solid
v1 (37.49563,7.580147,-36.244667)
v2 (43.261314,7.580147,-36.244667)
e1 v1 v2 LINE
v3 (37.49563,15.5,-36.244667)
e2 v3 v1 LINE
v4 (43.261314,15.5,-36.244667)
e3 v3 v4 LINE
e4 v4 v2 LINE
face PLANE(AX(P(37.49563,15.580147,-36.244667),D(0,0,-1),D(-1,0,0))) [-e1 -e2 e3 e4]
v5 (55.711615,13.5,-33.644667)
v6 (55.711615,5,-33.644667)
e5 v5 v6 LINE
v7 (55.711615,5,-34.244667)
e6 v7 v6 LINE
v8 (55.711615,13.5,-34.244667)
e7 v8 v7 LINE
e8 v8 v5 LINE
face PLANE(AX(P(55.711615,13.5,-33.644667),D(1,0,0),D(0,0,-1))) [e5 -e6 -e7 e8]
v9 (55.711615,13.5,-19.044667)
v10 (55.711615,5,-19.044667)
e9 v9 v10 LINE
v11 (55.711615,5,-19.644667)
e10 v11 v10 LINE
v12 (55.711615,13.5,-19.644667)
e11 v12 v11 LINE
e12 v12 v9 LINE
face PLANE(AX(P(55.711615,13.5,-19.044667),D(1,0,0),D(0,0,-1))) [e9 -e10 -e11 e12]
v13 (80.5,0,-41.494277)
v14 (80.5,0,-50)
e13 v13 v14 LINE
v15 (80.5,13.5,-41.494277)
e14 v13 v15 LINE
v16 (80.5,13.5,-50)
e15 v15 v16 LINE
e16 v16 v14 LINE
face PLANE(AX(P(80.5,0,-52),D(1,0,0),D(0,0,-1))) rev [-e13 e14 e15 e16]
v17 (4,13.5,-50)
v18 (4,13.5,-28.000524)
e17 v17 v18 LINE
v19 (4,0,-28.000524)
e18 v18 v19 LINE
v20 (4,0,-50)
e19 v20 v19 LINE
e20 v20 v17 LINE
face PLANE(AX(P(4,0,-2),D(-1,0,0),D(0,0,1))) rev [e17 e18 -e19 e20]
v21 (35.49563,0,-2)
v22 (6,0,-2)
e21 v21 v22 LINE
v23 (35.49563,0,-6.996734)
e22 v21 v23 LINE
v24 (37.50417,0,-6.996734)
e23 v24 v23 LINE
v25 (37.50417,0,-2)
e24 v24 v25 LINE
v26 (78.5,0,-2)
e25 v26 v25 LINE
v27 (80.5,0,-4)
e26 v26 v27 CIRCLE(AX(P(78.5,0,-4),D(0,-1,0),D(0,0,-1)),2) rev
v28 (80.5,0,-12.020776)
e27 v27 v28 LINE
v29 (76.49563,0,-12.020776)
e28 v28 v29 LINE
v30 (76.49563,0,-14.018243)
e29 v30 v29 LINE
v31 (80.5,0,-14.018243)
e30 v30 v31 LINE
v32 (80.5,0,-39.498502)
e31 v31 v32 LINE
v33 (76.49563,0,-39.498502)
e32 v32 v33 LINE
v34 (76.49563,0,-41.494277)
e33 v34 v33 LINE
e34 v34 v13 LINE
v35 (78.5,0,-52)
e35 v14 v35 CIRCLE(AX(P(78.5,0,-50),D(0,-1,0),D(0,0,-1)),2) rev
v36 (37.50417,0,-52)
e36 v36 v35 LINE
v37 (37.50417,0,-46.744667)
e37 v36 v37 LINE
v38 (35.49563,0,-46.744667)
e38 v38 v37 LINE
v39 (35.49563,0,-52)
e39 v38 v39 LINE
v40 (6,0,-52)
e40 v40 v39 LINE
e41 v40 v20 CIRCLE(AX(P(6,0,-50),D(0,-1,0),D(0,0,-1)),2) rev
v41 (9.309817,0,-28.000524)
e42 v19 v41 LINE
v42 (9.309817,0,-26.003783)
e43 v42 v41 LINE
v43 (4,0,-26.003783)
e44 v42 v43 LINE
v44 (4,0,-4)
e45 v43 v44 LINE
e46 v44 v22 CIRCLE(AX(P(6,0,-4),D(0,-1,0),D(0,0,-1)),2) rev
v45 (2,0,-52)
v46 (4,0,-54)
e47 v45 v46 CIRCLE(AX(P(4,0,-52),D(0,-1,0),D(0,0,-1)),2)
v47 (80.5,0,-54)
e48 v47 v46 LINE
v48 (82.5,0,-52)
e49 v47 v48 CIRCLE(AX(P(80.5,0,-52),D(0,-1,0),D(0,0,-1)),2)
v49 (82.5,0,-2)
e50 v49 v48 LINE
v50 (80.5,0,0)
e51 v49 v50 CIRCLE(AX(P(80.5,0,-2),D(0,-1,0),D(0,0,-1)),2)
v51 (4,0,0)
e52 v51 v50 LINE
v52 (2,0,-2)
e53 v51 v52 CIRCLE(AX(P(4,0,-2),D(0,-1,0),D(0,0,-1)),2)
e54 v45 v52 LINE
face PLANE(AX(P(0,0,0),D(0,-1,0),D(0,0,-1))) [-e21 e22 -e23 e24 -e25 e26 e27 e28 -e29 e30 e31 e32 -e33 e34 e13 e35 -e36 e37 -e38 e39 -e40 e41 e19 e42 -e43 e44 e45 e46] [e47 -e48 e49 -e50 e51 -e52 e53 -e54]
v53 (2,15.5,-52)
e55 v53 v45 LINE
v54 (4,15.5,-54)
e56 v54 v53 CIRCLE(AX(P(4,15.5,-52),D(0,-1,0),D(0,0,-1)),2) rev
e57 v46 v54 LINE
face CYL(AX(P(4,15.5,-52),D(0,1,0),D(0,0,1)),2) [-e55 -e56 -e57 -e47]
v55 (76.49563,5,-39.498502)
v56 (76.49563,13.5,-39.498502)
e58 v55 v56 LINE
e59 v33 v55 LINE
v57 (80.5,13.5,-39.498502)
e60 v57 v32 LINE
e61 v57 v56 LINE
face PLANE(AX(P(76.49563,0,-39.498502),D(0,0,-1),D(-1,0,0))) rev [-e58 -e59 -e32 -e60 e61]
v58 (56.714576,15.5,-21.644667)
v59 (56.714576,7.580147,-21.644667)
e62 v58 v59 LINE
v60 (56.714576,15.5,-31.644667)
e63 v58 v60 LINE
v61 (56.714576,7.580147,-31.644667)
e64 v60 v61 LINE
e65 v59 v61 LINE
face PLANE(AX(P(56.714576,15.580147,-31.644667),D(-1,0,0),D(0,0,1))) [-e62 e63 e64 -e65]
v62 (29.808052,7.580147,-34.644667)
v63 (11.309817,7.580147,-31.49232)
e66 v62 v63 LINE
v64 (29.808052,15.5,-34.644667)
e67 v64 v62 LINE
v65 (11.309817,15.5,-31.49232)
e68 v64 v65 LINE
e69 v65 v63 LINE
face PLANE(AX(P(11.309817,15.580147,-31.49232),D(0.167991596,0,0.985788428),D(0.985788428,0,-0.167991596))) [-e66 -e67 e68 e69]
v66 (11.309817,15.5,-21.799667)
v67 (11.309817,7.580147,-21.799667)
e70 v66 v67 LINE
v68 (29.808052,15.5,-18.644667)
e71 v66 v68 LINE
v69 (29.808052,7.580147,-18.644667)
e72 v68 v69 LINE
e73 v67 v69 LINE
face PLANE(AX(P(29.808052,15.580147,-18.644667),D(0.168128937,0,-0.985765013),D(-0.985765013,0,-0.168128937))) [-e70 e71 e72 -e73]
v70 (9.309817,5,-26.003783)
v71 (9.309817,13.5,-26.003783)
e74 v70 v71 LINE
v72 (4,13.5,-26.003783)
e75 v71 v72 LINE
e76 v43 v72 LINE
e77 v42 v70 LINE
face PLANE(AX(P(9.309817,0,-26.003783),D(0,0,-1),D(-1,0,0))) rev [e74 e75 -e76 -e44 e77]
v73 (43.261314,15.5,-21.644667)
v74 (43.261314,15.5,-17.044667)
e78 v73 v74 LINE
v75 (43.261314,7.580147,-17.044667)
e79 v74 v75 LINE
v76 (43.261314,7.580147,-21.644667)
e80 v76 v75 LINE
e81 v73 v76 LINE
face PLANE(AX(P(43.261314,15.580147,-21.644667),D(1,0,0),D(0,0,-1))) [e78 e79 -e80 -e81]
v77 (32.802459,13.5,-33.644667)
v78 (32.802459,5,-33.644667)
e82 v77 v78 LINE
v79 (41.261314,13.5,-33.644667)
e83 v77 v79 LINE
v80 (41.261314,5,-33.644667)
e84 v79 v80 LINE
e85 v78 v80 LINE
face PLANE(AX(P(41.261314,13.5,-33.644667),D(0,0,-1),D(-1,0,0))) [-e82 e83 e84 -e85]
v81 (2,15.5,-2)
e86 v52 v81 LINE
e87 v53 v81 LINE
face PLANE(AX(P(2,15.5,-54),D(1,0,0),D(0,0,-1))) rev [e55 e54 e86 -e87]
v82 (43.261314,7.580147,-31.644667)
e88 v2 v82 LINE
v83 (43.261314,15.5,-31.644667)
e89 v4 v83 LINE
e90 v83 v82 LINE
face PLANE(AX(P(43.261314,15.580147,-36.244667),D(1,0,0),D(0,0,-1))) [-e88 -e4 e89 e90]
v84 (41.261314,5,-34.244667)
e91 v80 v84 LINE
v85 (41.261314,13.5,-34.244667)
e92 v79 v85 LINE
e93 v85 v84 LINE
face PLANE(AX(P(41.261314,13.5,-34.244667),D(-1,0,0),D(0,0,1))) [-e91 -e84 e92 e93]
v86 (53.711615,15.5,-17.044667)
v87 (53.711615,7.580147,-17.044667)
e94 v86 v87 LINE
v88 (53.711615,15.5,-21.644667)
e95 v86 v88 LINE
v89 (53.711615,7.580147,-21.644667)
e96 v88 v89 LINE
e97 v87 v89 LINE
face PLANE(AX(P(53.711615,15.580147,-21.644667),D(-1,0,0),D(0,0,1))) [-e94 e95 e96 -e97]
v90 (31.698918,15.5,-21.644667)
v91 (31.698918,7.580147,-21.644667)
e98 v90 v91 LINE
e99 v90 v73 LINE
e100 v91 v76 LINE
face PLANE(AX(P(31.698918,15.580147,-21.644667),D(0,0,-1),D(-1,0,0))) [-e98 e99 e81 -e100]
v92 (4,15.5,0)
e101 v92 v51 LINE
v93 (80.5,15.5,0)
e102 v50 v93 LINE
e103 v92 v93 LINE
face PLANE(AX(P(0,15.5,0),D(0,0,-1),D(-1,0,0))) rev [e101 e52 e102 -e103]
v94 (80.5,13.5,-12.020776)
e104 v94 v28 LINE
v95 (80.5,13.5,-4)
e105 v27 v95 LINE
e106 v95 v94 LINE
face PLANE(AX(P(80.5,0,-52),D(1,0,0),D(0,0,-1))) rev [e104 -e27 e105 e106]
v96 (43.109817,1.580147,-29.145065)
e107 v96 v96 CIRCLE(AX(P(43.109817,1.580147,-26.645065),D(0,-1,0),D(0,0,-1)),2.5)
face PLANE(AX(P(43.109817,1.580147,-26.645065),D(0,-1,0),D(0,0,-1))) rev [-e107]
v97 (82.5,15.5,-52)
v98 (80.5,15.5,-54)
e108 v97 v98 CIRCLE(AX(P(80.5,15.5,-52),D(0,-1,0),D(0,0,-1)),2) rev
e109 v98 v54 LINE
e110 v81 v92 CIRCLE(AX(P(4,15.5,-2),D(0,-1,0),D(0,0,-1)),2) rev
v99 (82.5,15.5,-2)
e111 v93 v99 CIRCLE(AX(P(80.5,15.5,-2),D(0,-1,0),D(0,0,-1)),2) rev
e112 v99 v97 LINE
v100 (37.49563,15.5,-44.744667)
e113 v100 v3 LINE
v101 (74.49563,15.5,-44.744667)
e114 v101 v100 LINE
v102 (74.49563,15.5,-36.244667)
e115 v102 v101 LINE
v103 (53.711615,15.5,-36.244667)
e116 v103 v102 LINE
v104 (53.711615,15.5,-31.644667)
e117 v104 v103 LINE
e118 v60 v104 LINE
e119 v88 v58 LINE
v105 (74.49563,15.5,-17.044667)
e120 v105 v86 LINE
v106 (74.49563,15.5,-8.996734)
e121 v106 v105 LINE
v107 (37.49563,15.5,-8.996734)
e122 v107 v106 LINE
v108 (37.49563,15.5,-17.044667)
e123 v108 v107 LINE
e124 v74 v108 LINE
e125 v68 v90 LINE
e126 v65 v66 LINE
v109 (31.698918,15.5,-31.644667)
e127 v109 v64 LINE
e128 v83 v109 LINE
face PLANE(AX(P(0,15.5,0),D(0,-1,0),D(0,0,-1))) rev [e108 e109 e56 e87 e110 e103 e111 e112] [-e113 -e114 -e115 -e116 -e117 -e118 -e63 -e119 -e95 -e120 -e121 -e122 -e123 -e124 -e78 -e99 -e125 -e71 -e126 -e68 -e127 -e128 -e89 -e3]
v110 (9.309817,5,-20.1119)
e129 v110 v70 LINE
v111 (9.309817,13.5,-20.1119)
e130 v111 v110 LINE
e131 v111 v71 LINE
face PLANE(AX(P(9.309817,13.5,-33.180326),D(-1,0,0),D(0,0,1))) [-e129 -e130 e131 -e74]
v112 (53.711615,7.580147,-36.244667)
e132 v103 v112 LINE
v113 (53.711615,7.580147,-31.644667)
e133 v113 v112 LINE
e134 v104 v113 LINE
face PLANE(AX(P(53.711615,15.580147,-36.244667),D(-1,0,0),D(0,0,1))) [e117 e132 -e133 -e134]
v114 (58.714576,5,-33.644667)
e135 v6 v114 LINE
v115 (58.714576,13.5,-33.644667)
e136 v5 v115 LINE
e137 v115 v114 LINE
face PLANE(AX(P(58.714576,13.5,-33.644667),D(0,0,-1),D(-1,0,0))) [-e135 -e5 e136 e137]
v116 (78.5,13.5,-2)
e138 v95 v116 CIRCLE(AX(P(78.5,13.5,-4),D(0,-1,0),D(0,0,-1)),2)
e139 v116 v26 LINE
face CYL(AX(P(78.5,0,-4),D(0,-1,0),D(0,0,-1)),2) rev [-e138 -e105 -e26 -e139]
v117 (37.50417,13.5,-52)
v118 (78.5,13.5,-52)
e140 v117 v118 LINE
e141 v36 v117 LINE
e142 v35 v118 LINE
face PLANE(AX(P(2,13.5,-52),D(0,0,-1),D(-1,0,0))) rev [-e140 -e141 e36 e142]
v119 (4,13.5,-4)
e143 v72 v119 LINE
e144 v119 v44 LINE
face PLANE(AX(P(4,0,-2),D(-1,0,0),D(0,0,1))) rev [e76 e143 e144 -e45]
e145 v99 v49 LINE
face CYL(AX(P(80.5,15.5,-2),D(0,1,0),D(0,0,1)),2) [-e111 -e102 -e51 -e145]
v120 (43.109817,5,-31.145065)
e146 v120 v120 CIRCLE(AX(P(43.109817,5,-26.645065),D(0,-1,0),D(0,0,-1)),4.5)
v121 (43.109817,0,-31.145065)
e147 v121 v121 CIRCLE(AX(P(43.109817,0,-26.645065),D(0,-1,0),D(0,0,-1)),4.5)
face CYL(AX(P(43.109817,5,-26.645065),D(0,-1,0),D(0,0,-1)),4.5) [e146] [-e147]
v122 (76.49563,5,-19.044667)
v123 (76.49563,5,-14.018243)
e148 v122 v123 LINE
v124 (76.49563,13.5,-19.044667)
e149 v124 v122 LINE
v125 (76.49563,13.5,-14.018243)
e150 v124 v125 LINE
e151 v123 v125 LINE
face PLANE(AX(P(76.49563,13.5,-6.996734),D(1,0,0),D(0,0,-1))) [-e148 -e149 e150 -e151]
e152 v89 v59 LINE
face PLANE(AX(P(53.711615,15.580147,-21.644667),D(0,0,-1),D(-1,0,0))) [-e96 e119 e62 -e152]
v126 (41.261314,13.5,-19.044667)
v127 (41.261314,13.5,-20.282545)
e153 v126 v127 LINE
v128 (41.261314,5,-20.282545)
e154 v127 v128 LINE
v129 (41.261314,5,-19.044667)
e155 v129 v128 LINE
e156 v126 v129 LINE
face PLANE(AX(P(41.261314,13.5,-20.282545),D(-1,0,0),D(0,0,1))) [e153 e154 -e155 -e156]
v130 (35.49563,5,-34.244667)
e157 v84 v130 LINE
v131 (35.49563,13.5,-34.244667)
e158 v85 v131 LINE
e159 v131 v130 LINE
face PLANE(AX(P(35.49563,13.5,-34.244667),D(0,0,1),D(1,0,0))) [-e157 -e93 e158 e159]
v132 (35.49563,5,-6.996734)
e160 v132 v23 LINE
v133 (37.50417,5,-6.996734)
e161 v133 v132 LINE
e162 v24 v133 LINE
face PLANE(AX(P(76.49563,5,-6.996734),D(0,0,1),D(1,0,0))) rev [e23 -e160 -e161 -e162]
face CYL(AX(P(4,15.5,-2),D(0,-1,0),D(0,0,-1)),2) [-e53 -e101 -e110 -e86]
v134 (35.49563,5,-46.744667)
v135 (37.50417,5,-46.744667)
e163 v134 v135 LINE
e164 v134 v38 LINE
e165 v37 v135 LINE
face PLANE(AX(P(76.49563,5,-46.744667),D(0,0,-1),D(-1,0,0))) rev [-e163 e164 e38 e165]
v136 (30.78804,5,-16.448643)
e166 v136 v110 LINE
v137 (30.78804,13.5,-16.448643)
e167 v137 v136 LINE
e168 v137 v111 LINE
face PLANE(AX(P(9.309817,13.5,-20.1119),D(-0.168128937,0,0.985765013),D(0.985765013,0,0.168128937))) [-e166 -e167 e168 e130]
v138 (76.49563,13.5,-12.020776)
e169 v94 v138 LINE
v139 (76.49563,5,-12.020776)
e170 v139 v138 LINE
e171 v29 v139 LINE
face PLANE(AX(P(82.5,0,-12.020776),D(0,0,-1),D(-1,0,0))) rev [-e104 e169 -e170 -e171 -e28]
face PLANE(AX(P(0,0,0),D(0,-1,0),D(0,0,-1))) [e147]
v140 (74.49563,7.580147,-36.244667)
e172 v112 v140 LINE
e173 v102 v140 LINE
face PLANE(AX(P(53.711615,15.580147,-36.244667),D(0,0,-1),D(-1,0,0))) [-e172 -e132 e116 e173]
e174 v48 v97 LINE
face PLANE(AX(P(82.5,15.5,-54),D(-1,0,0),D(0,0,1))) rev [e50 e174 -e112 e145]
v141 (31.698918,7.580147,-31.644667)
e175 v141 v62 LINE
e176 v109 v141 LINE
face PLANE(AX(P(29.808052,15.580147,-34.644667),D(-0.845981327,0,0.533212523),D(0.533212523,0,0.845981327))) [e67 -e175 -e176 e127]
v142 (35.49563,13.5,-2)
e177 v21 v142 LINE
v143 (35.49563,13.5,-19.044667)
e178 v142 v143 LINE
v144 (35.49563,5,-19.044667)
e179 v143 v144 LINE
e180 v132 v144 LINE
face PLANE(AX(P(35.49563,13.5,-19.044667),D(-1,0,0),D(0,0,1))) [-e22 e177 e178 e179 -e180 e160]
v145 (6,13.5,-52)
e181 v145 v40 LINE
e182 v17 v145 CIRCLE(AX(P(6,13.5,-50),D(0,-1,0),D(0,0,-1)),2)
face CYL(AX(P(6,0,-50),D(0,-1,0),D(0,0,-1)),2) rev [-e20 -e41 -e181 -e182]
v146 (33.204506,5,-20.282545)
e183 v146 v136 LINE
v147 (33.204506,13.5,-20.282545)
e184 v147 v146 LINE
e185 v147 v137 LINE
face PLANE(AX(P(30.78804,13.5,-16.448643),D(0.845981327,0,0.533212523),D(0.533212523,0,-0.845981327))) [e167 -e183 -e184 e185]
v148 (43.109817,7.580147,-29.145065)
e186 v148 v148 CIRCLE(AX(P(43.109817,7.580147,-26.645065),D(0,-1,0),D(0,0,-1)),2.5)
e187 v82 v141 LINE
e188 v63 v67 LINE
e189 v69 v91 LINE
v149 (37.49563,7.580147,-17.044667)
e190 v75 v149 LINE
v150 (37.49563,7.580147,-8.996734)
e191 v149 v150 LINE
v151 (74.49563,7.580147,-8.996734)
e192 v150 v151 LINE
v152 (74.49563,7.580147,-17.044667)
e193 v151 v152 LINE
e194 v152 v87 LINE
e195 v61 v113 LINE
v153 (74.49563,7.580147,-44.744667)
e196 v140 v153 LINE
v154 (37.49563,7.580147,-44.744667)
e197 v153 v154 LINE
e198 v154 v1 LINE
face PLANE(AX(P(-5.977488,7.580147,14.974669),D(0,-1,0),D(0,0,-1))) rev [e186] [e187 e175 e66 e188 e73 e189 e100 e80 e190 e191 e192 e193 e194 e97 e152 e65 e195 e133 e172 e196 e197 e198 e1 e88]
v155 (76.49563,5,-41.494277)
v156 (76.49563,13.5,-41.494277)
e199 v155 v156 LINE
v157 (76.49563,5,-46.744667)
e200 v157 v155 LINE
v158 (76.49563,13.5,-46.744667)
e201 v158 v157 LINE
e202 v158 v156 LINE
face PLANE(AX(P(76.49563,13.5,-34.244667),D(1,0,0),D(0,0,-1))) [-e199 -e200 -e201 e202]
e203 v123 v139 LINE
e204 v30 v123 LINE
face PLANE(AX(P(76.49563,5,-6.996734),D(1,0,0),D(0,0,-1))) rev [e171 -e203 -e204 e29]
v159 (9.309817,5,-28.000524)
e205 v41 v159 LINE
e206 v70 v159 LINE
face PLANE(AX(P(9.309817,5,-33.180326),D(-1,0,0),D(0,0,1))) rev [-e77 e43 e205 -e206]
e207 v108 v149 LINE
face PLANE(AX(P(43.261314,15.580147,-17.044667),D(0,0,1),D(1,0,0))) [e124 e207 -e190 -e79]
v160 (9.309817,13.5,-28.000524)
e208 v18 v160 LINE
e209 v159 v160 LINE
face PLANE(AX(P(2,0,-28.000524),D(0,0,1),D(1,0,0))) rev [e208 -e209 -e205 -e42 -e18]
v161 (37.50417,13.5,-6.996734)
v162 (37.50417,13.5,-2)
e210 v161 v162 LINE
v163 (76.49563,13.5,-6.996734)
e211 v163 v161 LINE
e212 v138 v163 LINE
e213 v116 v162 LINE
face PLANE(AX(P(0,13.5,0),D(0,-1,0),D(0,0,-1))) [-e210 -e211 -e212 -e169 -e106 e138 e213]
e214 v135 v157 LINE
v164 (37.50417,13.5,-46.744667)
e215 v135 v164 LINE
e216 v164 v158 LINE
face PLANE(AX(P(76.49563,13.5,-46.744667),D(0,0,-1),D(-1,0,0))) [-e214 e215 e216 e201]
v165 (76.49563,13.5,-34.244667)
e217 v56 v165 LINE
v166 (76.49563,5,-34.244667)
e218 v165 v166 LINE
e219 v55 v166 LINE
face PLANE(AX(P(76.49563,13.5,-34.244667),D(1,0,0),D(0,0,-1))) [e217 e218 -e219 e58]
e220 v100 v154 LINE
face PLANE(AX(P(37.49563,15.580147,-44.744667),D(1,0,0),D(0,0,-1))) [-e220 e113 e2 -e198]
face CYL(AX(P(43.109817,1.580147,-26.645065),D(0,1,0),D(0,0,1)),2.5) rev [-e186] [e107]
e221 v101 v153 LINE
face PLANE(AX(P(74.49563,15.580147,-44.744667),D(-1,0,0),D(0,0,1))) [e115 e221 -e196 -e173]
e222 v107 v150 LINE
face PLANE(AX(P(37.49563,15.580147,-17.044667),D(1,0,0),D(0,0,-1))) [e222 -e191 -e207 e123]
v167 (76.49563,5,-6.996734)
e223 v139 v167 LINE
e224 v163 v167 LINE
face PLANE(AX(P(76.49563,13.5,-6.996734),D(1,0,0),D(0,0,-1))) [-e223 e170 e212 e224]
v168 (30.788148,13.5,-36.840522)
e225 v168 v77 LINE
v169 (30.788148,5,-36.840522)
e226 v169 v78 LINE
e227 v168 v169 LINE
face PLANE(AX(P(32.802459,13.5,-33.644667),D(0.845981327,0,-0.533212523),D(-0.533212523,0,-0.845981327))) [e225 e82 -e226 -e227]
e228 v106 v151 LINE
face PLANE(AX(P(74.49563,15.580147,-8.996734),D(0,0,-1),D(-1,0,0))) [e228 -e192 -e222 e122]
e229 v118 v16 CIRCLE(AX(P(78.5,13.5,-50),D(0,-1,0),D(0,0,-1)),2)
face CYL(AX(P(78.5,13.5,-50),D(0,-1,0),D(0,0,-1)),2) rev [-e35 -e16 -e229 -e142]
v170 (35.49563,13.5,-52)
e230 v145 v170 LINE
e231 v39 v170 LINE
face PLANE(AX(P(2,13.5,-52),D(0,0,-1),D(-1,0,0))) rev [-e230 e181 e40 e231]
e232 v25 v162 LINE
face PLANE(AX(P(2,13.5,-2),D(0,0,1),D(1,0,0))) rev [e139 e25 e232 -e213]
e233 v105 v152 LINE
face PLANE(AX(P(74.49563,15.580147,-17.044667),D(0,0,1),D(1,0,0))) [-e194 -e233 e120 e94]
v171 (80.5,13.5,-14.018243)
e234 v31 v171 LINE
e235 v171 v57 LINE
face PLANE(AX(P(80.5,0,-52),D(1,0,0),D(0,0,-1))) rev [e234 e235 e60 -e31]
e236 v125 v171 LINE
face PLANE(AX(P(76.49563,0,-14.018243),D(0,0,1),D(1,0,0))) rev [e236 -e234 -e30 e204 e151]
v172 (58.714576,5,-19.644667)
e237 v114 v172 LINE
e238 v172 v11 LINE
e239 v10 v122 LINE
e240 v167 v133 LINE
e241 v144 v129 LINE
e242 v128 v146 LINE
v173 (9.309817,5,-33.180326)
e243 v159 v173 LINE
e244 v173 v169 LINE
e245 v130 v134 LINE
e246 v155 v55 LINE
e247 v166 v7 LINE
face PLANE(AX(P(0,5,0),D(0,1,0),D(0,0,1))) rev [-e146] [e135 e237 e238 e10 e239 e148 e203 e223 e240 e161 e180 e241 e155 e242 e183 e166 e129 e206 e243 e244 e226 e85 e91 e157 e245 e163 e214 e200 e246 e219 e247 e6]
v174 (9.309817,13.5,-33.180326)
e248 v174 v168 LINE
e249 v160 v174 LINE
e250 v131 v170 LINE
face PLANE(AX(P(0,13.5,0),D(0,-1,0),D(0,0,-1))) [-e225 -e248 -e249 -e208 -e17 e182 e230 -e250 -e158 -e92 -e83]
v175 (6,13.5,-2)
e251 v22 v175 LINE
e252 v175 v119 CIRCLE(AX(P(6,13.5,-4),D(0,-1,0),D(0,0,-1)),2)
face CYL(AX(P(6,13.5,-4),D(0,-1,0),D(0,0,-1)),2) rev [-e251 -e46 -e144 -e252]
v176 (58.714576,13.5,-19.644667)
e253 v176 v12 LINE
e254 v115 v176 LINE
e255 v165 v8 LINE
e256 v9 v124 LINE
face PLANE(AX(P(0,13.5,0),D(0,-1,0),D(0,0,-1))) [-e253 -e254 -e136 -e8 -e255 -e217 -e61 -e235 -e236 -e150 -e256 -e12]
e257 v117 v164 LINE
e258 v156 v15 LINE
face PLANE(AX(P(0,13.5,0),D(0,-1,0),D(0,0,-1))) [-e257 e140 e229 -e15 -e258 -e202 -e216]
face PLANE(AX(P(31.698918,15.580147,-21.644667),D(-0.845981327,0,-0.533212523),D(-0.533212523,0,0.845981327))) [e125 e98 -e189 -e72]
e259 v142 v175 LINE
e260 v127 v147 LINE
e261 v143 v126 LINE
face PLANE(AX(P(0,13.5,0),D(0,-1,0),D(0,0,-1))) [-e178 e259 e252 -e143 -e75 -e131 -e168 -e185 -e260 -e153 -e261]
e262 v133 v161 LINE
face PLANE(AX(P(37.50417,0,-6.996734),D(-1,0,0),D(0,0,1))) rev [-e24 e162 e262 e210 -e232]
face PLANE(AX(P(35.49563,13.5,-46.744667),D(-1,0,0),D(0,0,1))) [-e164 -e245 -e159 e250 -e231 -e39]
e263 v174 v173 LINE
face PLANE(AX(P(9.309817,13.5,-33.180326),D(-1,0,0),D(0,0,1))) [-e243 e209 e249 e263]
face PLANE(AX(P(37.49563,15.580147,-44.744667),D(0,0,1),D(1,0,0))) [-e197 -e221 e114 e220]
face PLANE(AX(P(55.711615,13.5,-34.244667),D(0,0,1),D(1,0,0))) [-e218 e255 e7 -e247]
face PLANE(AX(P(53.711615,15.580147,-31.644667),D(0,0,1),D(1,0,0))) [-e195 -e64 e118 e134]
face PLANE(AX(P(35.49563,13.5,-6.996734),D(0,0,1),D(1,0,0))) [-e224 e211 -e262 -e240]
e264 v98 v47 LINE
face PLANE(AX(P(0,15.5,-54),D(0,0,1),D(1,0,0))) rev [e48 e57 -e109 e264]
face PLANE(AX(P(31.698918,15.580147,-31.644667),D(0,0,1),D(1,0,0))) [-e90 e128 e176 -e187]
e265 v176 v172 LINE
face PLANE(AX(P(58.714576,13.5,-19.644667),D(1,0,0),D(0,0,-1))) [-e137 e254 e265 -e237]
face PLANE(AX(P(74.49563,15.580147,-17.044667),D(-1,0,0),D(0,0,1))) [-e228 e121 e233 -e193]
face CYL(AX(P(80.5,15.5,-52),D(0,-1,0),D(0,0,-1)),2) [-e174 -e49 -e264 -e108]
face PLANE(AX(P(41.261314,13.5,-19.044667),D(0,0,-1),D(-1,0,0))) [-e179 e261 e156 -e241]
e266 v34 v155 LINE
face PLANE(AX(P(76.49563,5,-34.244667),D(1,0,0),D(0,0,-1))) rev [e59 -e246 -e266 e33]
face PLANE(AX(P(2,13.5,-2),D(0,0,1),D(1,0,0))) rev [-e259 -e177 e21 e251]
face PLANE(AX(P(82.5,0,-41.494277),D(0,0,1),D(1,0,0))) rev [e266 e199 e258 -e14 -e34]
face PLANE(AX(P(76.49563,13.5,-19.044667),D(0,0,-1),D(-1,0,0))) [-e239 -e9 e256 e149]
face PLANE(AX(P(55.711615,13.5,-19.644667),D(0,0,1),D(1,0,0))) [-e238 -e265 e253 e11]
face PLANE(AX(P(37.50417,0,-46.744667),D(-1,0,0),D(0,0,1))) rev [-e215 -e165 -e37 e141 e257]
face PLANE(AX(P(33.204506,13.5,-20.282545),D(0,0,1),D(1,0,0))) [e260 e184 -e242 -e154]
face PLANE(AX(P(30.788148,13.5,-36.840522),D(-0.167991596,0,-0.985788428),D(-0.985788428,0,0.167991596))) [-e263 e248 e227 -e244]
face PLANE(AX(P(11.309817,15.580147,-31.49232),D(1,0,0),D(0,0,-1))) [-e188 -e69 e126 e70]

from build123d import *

# Parameters (mm, degrees)
SKETCH1_W           = 84.5
SKETCH1_H           = 54
BOSS_EXTRUDE2_DEPTH = 15.5
FILLET1_R           = 2
Y_WING_START        = -26.76167351
Y_WING_DEPTH        = 8
Y_WING_START_2      = -32.76167351
Y_WING_2_OUTLINE_R  = 2.5
Y_WING_2_DEPTH      = 6
SKETCH2_W           = 80.5
SKETCH2_H           = 50
CUT_EXTRUDE1_DEPTH  = 13.5
SKETCH3_W           = 2.008539682
SKETCH3_H           = 5.255332567
SKETCH3_H_2         = 4.996733938
BOSS_EXTRUDE3_DEPTH = 13.5
SKETCH4_R           = 4.5
CUT_EXTRUDE2_DEPTH  = 5
SKETCH5_W           = 2
SKETCH5_H           = 54
CUT_EXTRUDE3_DEPTH  = 15.5
SKETCH6_W           = 2
SKETCH6_H           = 50
BOSS_EXTRUDE4_DEPTH = 13.5
FILLET2_R           = 2


with BuildPart() as part:
    # Sketch1 → Boss-Extrude2 (new body)
    with BuildSketch(Plane(origin=(0, 0, 0), x_dir=(1, 0, 0), z_dir=(0, 1, 0))):
        with Locations((42.25, 27)):
            Rectangle(SKETCH1_W, SKETCH1_H)
    extrude(amount=BOSS_EXTRUDE2_DEPTH)

    # Fillet1
    fillet1_edges = [part.edges().sort_by_distance(p)[0] for p in [
        (0, 7.75, -54),
        (84.5, 7.75, -54),
        (84.5, 7.75, 0),
        (0, 7.75, 0),
    ]]
    fillet(fillet1_edges, radius=FILLET1_R)


with BuildPart() as body_2:
    # Y-Wing: read off the stored shape, not the designer's step
    # Y-Wing outline → Y-Wing (new body)
    with BuildSketch(Plane(origin=(0, 0, 0), x_dir=(1, 0, 0), z_dir=(0, 1, 0)).offset(Y_WING_START)):
        Polygon((-37.998848216, 80.77793428), (-49.561243891, 80.77793428), (-51.452110178, 83.77793428), (-69.950345376, 80.625586413), (-69.950345376, 70.93293428), (-51.452110178, 67.77793428), (-49.561243891, 70.77793428), (-37.998848216, 70.77793428), (-37.998848216, 66.17793428), (-43.764531914, 66.17793428), (-43.764531914, 58.130000785), (-6.764531914, 58.130000785), (-6.764531914, 66.17793428), (-27.548546514, 66.17793428), (-27.548546514, 70.77793428), (-24.545586254, 70.77793428), (-24.545586254, 80.77793428), (-27.548546514, 80.77793428), (-27.548546514, 85.37793428), (-6.764531914, 85.37793428), (-6.764531914, 93.87793428), (-43.764531914, 93.87793428), (-43.764531914, 85.37793428), (-37.998848216, 85.37793428), align=None)
    extrude(amount=Y_WING_DEPTH)

    # Y-Wing 2 outline → Y-Wing 2 (add)
    with BuildSketch(Plane(origin=(0, 0, 0), x_dir=(1, 0, 0), z_dir=(0, 1, 0)).offset(Y_WING_START_2)):
        with Locations((-38.150345376, 75.778331613)):
            Circle(Y_WING_2_OUTLINE_R)
    extrude(amount=Y_WING_2_DEPTH)


with BuildPart() as body_2_1:
    # Body-Move/Copy3: moved
    add(body_2.part.moved(Location((81.260162004, 34.341820547, 49.133266847))))


with BuildPart() as part_1:
    add(part.part)

    # Intersect1: read off the stored shape, not the designer's step
    # Intersect1: cut body 2
    add(body_2_1.part, mode=Mode.SUBTRACT)

    # Sketch2 → Cut-Extrude1 (cut)
    with BuildSketch(Plane.XZ):
        with Locations((42.25, -27)):
            Rectangle(SKETCH2_W, SKETCH2_H)
        Polygon((30.788040431, -16.448642605), (33.204506118, -20.282545146), (41.261313787, -20.282545146), (41.261313787, -19.044667433), (35.495630089, -19.044667433), (35.495630089, -6.996733938), (76.495630089, -6.996733938), (76.495630089, -19.044667433), (55.71161549, -19.044667433), (55.71161549, -19.644667433), (58.714575749, -19.644667433), (58.714575749, -33.644667433), (55.71161549, -33.644667433), (55.71161549, -34.244667433), (76.495630089, -34.244667433), (76.495630089, -46.744667433), (35.495630089, -46.744667433), (35.495630089, -34.244667433), (41.261313787, -34.244667433), (41.261313787, -33.644667433), (36.074948333, -33.644667433), (32.802458964, -33.644667433), (30.788147827, -36.840521868), (9.309816627, -33.180325595), (9.309816627, -20.111899958), align=None, mode=Mode.SUBTRACT)
    extrude(amount=-CUT_EXTRUDE1_DEPTH, mode=Mode.SUBTRACT)

    # Sketch3 → Boss-Extrude3 (add)
    with BuildSketch(Plane.XZ.offset(-13.5)):
        Polygon((2, -27), (2, -28.000523913), (9.309816627, -28.000523913), (9.309816627, -27), (9.309816627, -26.003783182), (2, -26.003783182), align=None)
        with Locations((36.49989993, -49.372333717)):
            Rectangle(SKETCH3_W, SKETCH3_H)
        Polygon((76.495630089, -40.494667433), (76.495630089, -39.49850229), (82.5, -39.49850229), (82.5, -40.494667433), (82.5, -41.494277076), (76.495630089, -41.494277076), align=None)
        Polygon((76.495630089, -13.020700685), (76.495630089, -14.018243481), (82.5, -14.018243481), (82.5, -13.020700685), (82.5, -12.020776308), (76.495630089, -12.020776308), align=None)
        with Locations((36.49989993, -4.498366969)):
            Rectangle(SKETCH3_W, SKETCH3_H_2)
    extrude(amount=BOSS_EXTRUDE3_DEPTH)

    # Sketch4 → Cut-Extrude2 (cut)
    with BuildSketch(Plane.XZ):
        Polygon((9.309816627, -20.111899958), (30.788040431, -16.448642605), (33.204506118, -20.282545146), (41.261313787, -20.282545146), (41.261313787, -19.044667433), (35.495630089, -19.044667433), (35.495630089, -6.996733938), (76.495630089, -6.996733938), (76.495630089, -19.044667433), (55.71161549, -19.044667433), (55.71161549, -19.644667433), (58.714575749, -19.644667433), (58.714575749, -33.644667433), (55.71161549, -33.644667433), (55.71161549, -34.244667433), (76.495630089, -34.244667433), (76.495630089, -46.744667433), (35.495630089, -46.744667433), (35.495630089, -34.244667433), (41.261313787, -34.244667433), (41.261313787, -33.644667433), (32.802458964, -33.644667433), (30.788147827, -36.840521868), (9.309816627, -33.180325595), align=None)
        with Locations(Location((43.109816627, -26.645064766, 0), (0, 0, 270))):
            Circle(SKETCH4_R, mode=Mode.SUBTRACT)
    extrude(amount=-CUT_EXTRUDE2_DEPTH, mode=Mode.SUBTRACT)

    # Sketch5 → Cut-Extrude3 (cut)
    with BuildSketch(Plane(origin=(0, 0, 0), x_dir=(-1, 0, 0), z_dir=(0, -1, 0))):
        with Locations((-1, 27)):
            Rectangle(SKETCH5_W, SKETCH5_H)
        with Locations((-83.5, 27)):
            Rectangle(SKETCH5_W, SKETCH5_H)
    extrude(amount=-CUT_EXTRUDE3_DEPTH, mode=Mode.SUBTRACT)

    # Sketch6 → Boss-Extrude4 (add)
    with BuildSketch(Plane(origin=(0, 13.5, 0), x_dir=(-1, 0, 0), z_dir=(0, -1, 0))):
        with Locations((-3, 27)):
            Rectangle(SKETCH6_W, SKETCH6_H)
        with Locations((-81.5, 27)):
            Rectangle(SKETCH6_W, SKETCH6_H)
    extrude(amount=BOSS_EXTRUDE4_DEPTH)

    # Fillet2
    fillet2_edges = [part_1.edges().sort_by_distance(p)[0] for p in [
        (82.5, 7.75, -54),
        (2, 7.75, -54),
        (82.5, 7.75, 0),
        (2, 7.75, 0),
        (4, 6.75, -52),
        (4, 6.75, -2),
        (80.5, 6.75, -2),
        (80.5, 6.75, -52),
    ]]
    fillet(fillet2_edges, radius=FILLET2_R)


solid = part_1.part
